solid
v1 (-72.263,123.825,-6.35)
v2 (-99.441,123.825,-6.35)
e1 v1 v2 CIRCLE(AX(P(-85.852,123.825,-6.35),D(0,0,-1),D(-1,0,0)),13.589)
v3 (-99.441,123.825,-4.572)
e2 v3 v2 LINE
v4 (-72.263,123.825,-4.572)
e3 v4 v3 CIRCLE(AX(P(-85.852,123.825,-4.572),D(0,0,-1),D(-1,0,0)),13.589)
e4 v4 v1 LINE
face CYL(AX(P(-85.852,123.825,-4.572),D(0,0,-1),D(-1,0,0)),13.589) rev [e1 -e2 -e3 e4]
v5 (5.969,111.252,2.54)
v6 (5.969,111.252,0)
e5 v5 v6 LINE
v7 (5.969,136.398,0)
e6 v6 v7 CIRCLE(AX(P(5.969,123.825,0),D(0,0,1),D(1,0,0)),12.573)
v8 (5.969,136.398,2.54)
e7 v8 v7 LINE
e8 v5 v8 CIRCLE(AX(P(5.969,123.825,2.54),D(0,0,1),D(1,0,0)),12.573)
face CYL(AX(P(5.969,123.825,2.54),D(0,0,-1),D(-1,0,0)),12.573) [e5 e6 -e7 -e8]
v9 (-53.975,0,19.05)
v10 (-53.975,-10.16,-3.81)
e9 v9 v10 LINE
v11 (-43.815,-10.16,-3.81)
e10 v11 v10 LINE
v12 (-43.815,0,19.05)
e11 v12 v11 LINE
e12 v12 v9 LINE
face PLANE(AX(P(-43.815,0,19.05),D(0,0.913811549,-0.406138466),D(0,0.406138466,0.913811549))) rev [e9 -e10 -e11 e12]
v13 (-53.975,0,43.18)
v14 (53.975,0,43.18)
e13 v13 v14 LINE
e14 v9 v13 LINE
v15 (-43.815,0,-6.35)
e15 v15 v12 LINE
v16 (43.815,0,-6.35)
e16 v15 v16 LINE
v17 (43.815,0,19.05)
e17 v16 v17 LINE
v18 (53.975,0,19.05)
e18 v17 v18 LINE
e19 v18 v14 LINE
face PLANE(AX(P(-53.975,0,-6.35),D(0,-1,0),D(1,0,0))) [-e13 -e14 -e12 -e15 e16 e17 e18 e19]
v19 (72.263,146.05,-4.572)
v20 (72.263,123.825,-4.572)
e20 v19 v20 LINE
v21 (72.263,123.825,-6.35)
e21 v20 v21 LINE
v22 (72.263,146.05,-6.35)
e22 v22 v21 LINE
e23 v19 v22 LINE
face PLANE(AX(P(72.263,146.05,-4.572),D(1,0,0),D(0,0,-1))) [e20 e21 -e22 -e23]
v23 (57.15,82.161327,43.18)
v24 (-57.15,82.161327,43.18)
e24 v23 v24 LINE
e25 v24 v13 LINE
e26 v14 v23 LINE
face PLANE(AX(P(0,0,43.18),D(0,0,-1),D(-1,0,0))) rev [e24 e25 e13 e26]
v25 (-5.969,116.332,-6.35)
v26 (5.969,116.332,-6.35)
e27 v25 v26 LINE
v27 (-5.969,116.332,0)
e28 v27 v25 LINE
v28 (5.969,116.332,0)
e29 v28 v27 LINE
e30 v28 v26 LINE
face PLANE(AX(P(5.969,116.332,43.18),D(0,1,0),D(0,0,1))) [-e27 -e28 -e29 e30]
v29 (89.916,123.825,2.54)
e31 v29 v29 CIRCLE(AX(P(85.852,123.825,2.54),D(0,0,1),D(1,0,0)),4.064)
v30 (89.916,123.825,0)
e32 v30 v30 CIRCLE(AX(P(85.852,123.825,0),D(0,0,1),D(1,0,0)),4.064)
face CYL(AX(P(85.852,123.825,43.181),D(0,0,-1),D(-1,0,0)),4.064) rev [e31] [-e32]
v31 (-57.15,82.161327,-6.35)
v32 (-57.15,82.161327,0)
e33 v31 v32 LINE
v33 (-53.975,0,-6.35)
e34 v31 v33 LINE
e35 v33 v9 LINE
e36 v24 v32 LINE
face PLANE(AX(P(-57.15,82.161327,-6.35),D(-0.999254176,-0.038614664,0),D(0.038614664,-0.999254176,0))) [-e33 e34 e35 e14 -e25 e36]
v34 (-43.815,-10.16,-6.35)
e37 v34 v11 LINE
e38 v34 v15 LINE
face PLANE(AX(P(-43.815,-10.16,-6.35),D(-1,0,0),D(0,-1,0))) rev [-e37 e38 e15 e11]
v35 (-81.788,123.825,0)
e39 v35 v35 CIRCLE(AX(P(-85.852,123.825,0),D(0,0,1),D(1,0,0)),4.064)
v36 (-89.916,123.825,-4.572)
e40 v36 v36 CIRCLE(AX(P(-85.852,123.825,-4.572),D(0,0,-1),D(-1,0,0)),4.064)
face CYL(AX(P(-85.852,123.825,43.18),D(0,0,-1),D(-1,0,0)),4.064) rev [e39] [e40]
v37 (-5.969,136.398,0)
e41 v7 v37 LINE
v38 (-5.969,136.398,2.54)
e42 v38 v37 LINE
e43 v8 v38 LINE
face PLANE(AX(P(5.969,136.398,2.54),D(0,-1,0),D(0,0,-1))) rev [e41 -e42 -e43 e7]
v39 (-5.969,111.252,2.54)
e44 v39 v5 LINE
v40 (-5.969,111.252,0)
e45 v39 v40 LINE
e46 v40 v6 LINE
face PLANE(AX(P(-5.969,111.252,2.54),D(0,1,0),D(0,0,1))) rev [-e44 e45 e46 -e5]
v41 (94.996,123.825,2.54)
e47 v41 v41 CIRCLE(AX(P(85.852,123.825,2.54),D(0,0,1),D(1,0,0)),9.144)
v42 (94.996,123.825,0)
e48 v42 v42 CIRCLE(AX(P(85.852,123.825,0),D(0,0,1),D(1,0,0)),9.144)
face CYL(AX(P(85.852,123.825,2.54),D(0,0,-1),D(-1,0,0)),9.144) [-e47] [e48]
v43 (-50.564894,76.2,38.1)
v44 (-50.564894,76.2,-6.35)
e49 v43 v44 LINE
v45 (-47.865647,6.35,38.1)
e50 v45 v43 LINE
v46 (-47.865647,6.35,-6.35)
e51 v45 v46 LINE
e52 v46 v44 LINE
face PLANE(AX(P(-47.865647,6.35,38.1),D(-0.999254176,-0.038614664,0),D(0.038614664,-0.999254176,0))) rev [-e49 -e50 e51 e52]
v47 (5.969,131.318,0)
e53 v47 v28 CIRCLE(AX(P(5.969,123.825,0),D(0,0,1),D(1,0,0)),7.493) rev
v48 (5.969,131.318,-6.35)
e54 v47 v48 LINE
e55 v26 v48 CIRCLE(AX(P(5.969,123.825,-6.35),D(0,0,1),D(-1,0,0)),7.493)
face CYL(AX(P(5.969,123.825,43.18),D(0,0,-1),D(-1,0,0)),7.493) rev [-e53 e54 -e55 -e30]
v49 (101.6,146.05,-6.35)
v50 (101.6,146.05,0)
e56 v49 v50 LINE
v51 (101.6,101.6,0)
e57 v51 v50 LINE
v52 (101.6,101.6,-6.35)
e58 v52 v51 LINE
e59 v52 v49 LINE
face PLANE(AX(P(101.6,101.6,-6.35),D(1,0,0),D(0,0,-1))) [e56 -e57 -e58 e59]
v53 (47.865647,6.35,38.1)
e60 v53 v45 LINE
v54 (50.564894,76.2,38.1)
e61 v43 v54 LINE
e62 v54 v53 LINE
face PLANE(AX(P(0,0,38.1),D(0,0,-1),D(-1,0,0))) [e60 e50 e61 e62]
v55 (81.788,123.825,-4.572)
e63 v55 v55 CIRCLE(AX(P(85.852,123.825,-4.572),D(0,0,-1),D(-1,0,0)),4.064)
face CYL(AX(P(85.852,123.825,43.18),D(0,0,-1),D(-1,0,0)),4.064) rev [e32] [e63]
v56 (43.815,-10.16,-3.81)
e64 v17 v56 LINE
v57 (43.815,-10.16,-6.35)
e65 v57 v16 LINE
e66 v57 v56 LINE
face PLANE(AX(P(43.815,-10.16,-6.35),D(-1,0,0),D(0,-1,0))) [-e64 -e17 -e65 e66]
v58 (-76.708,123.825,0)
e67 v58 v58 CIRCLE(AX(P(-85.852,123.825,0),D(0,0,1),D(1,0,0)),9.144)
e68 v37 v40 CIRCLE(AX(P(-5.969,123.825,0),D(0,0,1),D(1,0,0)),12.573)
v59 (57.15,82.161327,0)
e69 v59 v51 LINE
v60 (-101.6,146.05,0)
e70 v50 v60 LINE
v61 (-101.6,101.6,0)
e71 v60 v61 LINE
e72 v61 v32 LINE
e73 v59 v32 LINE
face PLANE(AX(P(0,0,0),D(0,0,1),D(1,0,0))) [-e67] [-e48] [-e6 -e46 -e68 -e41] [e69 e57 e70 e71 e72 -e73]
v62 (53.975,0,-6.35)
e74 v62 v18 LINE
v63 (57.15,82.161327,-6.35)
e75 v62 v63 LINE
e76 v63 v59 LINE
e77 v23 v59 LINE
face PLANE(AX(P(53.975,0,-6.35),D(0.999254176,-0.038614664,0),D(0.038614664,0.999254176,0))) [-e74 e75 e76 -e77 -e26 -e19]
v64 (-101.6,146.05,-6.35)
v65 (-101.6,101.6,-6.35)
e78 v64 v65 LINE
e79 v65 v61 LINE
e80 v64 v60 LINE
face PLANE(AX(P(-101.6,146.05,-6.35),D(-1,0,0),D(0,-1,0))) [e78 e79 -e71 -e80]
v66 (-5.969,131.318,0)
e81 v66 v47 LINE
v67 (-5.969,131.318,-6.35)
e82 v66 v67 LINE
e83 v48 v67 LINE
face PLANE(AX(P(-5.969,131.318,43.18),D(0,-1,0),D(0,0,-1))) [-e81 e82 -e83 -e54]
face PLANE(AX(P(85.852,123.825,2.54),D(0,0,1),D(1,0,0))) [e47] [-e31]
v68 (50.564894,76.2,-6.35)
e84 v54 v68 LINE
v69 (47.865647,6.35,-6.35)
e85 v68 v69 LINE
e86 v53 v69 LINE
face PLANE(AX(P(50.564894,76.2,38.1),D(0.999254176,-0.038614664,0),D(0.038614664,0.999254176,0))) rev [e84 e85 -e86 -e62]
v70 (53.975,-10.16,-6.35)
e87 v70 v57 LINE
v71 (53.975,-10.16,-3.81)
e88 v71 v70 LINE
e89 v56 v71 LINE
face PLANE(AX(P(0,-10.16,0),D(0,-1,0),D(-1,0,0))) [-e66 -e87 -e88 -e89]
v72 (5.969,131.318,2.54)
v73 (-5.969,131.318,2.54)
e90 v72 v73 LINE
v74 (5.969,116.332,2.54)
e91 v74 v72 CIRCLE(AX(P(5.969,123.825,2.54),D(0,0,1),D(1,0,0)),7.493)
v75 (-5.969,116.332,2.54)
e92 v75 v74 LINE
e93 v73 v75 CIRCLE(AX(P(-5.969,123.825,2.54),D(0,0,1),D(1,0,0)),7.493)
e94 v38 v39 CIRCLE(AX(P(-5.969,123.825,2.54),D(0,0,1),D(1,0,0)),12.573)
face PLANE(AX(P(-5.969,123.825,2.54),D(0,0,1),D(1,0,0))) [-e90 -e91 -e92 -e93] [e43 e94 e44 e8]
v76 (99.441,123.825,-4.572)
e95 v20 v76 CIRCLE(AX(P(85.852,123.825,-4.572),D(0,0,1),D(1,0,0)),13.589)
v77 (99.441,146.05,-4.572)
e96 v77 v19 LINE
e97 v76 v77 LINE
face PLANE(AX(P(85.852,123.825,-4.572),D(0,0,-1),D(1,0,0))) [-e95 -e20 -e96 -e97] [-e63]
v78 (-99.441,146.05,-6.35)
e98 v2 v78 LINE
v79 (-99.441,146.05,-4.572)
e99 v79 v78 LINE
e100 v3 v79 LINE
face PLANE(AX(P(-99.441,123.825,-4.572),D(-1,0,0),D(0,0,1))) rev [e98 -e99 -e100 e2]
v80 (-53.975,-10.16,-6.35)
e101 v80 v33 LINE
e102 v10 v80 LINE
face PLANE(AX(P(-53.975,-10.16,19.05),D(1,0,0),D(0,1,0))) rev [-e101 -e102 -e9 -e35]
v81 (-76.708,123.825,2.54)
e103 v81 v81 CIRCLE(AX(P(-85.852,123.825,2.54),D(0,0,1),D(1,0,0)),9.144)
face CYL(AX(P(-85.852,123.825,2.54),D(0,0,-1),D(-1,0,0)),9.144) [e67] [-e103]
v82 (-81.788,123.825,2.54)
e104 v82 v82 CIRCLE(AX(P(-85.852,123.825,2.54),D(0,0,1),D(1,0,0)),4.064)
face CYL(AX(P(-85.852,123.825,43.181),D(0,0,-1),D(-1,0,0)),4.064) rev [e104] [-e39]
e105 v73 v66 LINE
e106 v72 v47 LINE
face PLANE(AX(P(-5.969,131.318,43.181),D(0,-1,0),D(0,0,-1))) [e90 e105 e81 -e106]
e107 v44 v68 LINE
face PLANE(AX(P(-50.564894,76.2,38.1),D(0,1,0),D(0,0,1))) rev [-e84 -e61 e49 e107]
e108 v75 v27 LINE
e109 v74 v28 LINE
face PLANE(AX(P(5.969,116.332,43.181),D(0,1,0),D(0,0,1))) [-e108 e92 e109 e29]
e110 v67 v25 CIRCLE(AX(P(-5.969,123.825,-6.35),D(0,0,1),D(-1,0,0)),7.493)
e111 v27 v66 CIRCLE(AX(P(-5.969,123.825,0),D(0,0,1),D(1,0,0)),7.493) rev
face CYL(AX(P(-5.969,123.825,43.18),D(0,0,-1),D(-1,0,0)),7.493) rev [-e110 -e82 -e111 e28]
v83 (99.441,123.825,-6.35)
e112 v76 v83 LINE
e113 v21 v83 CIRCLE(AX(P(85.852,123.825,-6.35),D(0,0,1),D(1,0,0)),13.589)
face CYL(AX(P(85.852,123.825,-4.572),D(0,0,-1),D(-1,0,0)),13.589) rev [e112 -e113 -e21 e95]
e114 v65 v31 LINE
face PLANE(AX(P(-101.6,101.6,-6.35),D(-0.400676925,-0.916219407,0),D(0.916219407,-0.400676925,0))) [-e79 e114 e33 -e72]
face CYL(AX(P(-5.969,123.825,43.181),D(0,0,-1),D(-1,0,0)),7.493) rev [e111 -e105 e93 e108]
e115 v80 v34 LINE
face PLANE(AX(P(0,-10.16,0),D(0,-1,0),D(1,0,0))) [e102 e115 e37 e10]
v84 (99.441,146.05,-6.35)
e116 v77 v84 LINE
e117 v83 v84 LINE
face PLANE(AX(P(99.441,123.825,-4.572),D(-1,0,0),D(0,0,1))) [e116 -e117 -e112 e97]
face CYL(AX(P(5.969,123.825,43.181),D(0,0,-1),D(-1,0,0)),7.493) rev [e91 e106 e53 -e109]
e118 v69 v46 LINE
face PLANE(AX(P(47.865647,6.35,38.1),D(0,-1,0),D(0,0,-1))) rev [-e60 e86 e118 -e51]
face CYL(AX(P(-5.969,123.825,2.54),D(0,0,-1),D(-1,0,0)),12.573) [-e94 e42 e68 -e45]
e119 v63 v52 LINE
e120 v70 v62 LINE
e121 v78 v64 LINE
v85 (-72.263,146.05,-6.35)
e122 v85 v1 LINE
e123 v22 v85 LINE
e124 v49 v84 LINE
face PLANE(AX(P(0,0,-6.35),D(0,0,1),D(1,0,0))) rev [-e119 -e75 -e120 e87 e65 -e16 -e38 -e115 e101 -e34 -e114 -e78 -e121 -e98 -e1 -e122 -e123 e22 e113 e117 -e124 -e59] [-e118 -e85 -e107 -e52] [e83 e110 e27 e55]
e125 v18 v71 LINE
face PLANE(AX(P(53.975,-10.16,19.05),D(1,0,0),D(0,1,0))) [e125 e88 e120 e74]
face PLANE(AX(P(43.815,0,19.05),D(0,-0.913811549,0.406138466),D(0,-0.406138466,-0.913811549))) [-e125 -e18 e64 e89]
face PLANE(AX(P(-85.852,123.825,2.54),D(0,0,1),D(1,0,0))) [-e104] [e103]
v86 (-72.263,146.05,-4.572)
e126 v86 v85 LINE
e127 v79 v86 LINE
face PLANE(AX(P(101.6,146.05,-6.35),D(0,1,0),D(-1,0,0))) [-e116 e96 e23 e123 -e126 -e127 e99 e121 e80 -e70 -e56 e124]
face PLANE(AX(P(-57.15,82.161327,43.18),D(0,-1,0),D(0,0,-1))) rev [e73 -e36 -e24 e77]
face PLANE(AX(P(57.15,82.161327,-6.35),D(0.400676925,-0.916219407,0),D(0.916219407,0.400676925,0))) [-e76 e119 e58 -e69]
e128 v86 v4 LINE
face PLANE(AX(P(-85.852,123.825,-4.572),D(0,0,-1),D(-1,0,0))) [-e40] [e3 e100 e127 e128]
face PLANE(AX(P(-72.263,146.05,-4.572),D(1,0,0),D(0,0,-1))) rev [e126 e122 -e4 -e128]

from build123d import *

# Parameters (mm, degrees)
MAIN_BODY_DEPTH                    = 6.35
POCKET_OUTER_SURFACE_DEPTH         = 43.18
POCKET_INSIDE_DEPTH                = 44.45
SKETCH8_W                          = 10.16
SKETCH8_H                          = 25.4
BOTTOM_SCREW_MOUNT_DEPTH           = 10.16
BOTTOM_SCREW_MOUNT_EXTRUSION_DEPTH = 10.16
LIGHT_SOCKETS_DEPTH                = 184.078329957
LIGHT_SOCKETS_DEPTH_BACK           = 6.35
SKETCH17_R                         = 4.064
SKETCH18_R                         = 9.144
LIGHT_LIP_LINERS_DEPTH             = 2.54
LIGHT_LIP_SOCKETS_REACH            = 185.078
SKETCH17_2_R                       = 4.064
TAB_SLOTS_DEPTH                    = 1.778


# Sheet-metal steps are written as plain solids
with BuildPart() as part:
    # Sketch1 → Main Body (new body)
    with BuildSketch(Plane.XY):
        Polygon((-53.975, 0), (53.975, 0), (57.15, 82.161327118), (101.6, 101.6), (101.6, 146.05), (-101.6, 146.05), (-101.6, 101.6), (-57.15, 82.161327118), align=None)
    extrude(amount=-MAIN_BODY_DEPTH)

    # Sketch6 → Pocket-Outer Surface (add)
    with BuildSketch(Plane.XY):
        Polygon((53.975, 0), (-53.975, 0), (-57.15, 82.161327118), (57.15, 82.161327118), align=None)
    extrude(amount=POCKET_OUTER_SURFACE_DEPTH)

    # Sketch7 → Pocket-Inside (cut)
    with BuildSketch(Plane(origin=(0, 0, -6.35), x_dir=(-1, 0, 0), z_dir=(0, 0, -1))):
        Polygon((-50.564894027, 76.2), (-47.86564661, 6.35), (47.86564661, 6.35), (50.564894027, 76.2), align=None)
    extrude(amount=-POCKET_INSIDE_DEPTH, mode=Mode.SUBTRACT)

    # Sketch8 → Bottom Screw Mount (add)
    with BuildSketch(Plane.XZ):
        with Locations((-48.895, 6.35)):
            Rectangle(SKETCH8_W, SKETCH8_H)
    bottom_screw_mount = extrude(amount=BOTTOM_SCREW_MOUNT_DEPTH)

    # Sketch9 → Bottom Screw Mount Extrusion (cut)
    with BuildSketch(Plane.ZY.offset(53.975)):
        Polygon((-3.81, -10.16), (19.05, -10.16), (19.05, 0), align=None)
    bottom_screw_mount_extrusion = extrude(amount=-BOTTOM_SCREW_MOUNT_EXTRUSION_DEPTH, mode=Mode.SUBTRACT)

    # Left Bottom Screw Mount: Bottom Screw Mount, Bottom Screw Mount Extrusion across plane
    add(bottom_screw_mount.mirror(Plane(origin=(0, 0, 0), x_dir=(0, 0, 1), z_dir=(1, 0, 0))))
    add(bottom_screw_mount_extrusion.mirror(Plane(origin=(0, 0, 0), x_dir=(0, 0, 1), z_dir=(1, 0, 0))), mode=Mode.SUBTRACT)

    # Sketch17 → Light Sockets (cut, two sides: drawn at the far end of the back side and taken through both)
    with BuildSketch(Plane.XY.offset(-LIGHT_SOCKETS_DEPTH_BACK)):
        with Locations((85.852, 123.825)):
            Circle(SKETCH17_R)
        with Locations((-85.852, 123.825)):
            Circle(SKETCH17_R)
        with BuildLine():
            Line((-5.969, 131.318), (5.969, 131.318))
            ThreePointArc((5.969, 131.318), (13.462, 123.825), (5.969, 116.332))
            Line((5.969, 116.332), (-5.969, 116.332))
            ThreePointArc((-5.969, 116.332), (-13.462, 123.825), (-5.969, 131.318))
        make_face()
    extrude(amount=LIGHT_SOCKETS_DEPTH + LIGHT_SOCKETS_DEPTH_BACK, mode=Mode.SUBTRACT)

    # Sketch18 → Light Lip Liners (add)
    with BuildSketch(Plane.XY):
        with Locations((-85.852, 123.825)):
            Circle(SKETCH18_R)
        with Locations((85.852, 123.825)):
            Circle(SKETCH18_R)
        with BuildLine():
            Line((5.969, 136.398), (-5.969, 136.398))
            ThreePointArc((-5.969, 136.398), (-18.542, 123.825), (-5.969, 111.252))
            Line((-5.969, 111.252), (5.969, 111.252))
            ThreePointArc((5.969, 111.252), (18.542, 123.825), (5.969, 136.398))
        make_face()
    extrude(amount=LIGHT_LIP_LINERS_DEPTH)

    # Sketch17<2> → Light Lip Sockets (cut, up to next)
    with BuildSketch(Plane.XY, mode=Mode.PRIVATE) as light_lip_sockets_sk1:
        with Locations((85.852, 123.825)):
            Circle(SKETCH17_2_R)
    light_lip_sockets_tool1 = extrude(light_lip_sockets_sk1.sketch, amount=LIGHT_LIP_SOCKETS_REACH, mode=Mode.PRIVATE) & part.part
    # Sketch17<2> → Light Lip Sockets (cut, up to next)
    with BuildSketch(Plane.XY, mode=Mode.PRIVATE) as light_lip_sockets_sk2:
        with Locations((-85.852, 123.825)):
            Circle(SKETCH17_2_R)
    light_lip_sockets_tool2 = extrude(light_lip_sockets_sk2.sketch, amount=LIGHT_LIP_SOCKETS_REACH, mode=Mode.PRIVATE) & part.part
    # Sketch17<2> → Light Lip Sockets (cut, up to next)
    with BuildSketch(Plane.XY, mode=Mode.PRIVATE) as light_lip_sockets_sk3:
        with BuildLine():
            Line((-5.969, 131.318), (5.969, 131.318))
            ThreePointArc((5.969, 131.318), (13.462, 123.825), (5.969, 116.332))
            Line((5.969, 116.332), (-5.969, 116.332))
            ThreePointArc((-5.969, 116.332), (-13.462, 123.825), (-5.969, 131.318))
        make_face()
    light_lip_sockets_tool3 = extrude(light_lip_sockets_sk3.sketch, amount=LIGHT_LIP_SOCKETS_REACH, mode=Mode.PRIVATE) & part.part
    add(light_lip_sockets_tool1.solids().sort_by_distance((85.852, 123.825, 0))[0], mode=Mode.SUBTRACT)
    add(light_lip_sockets_tool2.solids().sort_by_distance((-85.852, 123.825, 0))[0], mode=Mode.SUBTRACT)
    add(light_lip_sockets_tool3.solids().sort_by_distance((0, 123.825, 0))[0], mode=Mode.SUBTRACT)

    # Sketch19 → Tab Slots (cut)
    with BuildSketch(Plane(origin=(0, 0, -6.35), x_dir=(-1, 0, 0), z_dir=(0, 0, -1))):
        with BuildLine():
            Line((72.263, 146.05), (72.263, 123.825))
            ThreePointArc((72.263, 123.825), (85.852, 110.236), (99.441, 123.825))
            Line((99.441, 123.825), (99.441, 146.05))
            Line((99.441, 146.05), (72.263, 146.05))
        make_face()
    tab_slots = extrude(amount=-TAB_SLOTS_DEPTH, mode=Mode.SUBTRACT)

    # Mirror3: Tab Slots across plane
    add(tab_slots.mirror(Plane(origin=(0, 0, 0), x_dir=(0, 0, 1), z_dir=(1, 0, 0))), mode=Mode.SUBTRACT)


solid = part.part
